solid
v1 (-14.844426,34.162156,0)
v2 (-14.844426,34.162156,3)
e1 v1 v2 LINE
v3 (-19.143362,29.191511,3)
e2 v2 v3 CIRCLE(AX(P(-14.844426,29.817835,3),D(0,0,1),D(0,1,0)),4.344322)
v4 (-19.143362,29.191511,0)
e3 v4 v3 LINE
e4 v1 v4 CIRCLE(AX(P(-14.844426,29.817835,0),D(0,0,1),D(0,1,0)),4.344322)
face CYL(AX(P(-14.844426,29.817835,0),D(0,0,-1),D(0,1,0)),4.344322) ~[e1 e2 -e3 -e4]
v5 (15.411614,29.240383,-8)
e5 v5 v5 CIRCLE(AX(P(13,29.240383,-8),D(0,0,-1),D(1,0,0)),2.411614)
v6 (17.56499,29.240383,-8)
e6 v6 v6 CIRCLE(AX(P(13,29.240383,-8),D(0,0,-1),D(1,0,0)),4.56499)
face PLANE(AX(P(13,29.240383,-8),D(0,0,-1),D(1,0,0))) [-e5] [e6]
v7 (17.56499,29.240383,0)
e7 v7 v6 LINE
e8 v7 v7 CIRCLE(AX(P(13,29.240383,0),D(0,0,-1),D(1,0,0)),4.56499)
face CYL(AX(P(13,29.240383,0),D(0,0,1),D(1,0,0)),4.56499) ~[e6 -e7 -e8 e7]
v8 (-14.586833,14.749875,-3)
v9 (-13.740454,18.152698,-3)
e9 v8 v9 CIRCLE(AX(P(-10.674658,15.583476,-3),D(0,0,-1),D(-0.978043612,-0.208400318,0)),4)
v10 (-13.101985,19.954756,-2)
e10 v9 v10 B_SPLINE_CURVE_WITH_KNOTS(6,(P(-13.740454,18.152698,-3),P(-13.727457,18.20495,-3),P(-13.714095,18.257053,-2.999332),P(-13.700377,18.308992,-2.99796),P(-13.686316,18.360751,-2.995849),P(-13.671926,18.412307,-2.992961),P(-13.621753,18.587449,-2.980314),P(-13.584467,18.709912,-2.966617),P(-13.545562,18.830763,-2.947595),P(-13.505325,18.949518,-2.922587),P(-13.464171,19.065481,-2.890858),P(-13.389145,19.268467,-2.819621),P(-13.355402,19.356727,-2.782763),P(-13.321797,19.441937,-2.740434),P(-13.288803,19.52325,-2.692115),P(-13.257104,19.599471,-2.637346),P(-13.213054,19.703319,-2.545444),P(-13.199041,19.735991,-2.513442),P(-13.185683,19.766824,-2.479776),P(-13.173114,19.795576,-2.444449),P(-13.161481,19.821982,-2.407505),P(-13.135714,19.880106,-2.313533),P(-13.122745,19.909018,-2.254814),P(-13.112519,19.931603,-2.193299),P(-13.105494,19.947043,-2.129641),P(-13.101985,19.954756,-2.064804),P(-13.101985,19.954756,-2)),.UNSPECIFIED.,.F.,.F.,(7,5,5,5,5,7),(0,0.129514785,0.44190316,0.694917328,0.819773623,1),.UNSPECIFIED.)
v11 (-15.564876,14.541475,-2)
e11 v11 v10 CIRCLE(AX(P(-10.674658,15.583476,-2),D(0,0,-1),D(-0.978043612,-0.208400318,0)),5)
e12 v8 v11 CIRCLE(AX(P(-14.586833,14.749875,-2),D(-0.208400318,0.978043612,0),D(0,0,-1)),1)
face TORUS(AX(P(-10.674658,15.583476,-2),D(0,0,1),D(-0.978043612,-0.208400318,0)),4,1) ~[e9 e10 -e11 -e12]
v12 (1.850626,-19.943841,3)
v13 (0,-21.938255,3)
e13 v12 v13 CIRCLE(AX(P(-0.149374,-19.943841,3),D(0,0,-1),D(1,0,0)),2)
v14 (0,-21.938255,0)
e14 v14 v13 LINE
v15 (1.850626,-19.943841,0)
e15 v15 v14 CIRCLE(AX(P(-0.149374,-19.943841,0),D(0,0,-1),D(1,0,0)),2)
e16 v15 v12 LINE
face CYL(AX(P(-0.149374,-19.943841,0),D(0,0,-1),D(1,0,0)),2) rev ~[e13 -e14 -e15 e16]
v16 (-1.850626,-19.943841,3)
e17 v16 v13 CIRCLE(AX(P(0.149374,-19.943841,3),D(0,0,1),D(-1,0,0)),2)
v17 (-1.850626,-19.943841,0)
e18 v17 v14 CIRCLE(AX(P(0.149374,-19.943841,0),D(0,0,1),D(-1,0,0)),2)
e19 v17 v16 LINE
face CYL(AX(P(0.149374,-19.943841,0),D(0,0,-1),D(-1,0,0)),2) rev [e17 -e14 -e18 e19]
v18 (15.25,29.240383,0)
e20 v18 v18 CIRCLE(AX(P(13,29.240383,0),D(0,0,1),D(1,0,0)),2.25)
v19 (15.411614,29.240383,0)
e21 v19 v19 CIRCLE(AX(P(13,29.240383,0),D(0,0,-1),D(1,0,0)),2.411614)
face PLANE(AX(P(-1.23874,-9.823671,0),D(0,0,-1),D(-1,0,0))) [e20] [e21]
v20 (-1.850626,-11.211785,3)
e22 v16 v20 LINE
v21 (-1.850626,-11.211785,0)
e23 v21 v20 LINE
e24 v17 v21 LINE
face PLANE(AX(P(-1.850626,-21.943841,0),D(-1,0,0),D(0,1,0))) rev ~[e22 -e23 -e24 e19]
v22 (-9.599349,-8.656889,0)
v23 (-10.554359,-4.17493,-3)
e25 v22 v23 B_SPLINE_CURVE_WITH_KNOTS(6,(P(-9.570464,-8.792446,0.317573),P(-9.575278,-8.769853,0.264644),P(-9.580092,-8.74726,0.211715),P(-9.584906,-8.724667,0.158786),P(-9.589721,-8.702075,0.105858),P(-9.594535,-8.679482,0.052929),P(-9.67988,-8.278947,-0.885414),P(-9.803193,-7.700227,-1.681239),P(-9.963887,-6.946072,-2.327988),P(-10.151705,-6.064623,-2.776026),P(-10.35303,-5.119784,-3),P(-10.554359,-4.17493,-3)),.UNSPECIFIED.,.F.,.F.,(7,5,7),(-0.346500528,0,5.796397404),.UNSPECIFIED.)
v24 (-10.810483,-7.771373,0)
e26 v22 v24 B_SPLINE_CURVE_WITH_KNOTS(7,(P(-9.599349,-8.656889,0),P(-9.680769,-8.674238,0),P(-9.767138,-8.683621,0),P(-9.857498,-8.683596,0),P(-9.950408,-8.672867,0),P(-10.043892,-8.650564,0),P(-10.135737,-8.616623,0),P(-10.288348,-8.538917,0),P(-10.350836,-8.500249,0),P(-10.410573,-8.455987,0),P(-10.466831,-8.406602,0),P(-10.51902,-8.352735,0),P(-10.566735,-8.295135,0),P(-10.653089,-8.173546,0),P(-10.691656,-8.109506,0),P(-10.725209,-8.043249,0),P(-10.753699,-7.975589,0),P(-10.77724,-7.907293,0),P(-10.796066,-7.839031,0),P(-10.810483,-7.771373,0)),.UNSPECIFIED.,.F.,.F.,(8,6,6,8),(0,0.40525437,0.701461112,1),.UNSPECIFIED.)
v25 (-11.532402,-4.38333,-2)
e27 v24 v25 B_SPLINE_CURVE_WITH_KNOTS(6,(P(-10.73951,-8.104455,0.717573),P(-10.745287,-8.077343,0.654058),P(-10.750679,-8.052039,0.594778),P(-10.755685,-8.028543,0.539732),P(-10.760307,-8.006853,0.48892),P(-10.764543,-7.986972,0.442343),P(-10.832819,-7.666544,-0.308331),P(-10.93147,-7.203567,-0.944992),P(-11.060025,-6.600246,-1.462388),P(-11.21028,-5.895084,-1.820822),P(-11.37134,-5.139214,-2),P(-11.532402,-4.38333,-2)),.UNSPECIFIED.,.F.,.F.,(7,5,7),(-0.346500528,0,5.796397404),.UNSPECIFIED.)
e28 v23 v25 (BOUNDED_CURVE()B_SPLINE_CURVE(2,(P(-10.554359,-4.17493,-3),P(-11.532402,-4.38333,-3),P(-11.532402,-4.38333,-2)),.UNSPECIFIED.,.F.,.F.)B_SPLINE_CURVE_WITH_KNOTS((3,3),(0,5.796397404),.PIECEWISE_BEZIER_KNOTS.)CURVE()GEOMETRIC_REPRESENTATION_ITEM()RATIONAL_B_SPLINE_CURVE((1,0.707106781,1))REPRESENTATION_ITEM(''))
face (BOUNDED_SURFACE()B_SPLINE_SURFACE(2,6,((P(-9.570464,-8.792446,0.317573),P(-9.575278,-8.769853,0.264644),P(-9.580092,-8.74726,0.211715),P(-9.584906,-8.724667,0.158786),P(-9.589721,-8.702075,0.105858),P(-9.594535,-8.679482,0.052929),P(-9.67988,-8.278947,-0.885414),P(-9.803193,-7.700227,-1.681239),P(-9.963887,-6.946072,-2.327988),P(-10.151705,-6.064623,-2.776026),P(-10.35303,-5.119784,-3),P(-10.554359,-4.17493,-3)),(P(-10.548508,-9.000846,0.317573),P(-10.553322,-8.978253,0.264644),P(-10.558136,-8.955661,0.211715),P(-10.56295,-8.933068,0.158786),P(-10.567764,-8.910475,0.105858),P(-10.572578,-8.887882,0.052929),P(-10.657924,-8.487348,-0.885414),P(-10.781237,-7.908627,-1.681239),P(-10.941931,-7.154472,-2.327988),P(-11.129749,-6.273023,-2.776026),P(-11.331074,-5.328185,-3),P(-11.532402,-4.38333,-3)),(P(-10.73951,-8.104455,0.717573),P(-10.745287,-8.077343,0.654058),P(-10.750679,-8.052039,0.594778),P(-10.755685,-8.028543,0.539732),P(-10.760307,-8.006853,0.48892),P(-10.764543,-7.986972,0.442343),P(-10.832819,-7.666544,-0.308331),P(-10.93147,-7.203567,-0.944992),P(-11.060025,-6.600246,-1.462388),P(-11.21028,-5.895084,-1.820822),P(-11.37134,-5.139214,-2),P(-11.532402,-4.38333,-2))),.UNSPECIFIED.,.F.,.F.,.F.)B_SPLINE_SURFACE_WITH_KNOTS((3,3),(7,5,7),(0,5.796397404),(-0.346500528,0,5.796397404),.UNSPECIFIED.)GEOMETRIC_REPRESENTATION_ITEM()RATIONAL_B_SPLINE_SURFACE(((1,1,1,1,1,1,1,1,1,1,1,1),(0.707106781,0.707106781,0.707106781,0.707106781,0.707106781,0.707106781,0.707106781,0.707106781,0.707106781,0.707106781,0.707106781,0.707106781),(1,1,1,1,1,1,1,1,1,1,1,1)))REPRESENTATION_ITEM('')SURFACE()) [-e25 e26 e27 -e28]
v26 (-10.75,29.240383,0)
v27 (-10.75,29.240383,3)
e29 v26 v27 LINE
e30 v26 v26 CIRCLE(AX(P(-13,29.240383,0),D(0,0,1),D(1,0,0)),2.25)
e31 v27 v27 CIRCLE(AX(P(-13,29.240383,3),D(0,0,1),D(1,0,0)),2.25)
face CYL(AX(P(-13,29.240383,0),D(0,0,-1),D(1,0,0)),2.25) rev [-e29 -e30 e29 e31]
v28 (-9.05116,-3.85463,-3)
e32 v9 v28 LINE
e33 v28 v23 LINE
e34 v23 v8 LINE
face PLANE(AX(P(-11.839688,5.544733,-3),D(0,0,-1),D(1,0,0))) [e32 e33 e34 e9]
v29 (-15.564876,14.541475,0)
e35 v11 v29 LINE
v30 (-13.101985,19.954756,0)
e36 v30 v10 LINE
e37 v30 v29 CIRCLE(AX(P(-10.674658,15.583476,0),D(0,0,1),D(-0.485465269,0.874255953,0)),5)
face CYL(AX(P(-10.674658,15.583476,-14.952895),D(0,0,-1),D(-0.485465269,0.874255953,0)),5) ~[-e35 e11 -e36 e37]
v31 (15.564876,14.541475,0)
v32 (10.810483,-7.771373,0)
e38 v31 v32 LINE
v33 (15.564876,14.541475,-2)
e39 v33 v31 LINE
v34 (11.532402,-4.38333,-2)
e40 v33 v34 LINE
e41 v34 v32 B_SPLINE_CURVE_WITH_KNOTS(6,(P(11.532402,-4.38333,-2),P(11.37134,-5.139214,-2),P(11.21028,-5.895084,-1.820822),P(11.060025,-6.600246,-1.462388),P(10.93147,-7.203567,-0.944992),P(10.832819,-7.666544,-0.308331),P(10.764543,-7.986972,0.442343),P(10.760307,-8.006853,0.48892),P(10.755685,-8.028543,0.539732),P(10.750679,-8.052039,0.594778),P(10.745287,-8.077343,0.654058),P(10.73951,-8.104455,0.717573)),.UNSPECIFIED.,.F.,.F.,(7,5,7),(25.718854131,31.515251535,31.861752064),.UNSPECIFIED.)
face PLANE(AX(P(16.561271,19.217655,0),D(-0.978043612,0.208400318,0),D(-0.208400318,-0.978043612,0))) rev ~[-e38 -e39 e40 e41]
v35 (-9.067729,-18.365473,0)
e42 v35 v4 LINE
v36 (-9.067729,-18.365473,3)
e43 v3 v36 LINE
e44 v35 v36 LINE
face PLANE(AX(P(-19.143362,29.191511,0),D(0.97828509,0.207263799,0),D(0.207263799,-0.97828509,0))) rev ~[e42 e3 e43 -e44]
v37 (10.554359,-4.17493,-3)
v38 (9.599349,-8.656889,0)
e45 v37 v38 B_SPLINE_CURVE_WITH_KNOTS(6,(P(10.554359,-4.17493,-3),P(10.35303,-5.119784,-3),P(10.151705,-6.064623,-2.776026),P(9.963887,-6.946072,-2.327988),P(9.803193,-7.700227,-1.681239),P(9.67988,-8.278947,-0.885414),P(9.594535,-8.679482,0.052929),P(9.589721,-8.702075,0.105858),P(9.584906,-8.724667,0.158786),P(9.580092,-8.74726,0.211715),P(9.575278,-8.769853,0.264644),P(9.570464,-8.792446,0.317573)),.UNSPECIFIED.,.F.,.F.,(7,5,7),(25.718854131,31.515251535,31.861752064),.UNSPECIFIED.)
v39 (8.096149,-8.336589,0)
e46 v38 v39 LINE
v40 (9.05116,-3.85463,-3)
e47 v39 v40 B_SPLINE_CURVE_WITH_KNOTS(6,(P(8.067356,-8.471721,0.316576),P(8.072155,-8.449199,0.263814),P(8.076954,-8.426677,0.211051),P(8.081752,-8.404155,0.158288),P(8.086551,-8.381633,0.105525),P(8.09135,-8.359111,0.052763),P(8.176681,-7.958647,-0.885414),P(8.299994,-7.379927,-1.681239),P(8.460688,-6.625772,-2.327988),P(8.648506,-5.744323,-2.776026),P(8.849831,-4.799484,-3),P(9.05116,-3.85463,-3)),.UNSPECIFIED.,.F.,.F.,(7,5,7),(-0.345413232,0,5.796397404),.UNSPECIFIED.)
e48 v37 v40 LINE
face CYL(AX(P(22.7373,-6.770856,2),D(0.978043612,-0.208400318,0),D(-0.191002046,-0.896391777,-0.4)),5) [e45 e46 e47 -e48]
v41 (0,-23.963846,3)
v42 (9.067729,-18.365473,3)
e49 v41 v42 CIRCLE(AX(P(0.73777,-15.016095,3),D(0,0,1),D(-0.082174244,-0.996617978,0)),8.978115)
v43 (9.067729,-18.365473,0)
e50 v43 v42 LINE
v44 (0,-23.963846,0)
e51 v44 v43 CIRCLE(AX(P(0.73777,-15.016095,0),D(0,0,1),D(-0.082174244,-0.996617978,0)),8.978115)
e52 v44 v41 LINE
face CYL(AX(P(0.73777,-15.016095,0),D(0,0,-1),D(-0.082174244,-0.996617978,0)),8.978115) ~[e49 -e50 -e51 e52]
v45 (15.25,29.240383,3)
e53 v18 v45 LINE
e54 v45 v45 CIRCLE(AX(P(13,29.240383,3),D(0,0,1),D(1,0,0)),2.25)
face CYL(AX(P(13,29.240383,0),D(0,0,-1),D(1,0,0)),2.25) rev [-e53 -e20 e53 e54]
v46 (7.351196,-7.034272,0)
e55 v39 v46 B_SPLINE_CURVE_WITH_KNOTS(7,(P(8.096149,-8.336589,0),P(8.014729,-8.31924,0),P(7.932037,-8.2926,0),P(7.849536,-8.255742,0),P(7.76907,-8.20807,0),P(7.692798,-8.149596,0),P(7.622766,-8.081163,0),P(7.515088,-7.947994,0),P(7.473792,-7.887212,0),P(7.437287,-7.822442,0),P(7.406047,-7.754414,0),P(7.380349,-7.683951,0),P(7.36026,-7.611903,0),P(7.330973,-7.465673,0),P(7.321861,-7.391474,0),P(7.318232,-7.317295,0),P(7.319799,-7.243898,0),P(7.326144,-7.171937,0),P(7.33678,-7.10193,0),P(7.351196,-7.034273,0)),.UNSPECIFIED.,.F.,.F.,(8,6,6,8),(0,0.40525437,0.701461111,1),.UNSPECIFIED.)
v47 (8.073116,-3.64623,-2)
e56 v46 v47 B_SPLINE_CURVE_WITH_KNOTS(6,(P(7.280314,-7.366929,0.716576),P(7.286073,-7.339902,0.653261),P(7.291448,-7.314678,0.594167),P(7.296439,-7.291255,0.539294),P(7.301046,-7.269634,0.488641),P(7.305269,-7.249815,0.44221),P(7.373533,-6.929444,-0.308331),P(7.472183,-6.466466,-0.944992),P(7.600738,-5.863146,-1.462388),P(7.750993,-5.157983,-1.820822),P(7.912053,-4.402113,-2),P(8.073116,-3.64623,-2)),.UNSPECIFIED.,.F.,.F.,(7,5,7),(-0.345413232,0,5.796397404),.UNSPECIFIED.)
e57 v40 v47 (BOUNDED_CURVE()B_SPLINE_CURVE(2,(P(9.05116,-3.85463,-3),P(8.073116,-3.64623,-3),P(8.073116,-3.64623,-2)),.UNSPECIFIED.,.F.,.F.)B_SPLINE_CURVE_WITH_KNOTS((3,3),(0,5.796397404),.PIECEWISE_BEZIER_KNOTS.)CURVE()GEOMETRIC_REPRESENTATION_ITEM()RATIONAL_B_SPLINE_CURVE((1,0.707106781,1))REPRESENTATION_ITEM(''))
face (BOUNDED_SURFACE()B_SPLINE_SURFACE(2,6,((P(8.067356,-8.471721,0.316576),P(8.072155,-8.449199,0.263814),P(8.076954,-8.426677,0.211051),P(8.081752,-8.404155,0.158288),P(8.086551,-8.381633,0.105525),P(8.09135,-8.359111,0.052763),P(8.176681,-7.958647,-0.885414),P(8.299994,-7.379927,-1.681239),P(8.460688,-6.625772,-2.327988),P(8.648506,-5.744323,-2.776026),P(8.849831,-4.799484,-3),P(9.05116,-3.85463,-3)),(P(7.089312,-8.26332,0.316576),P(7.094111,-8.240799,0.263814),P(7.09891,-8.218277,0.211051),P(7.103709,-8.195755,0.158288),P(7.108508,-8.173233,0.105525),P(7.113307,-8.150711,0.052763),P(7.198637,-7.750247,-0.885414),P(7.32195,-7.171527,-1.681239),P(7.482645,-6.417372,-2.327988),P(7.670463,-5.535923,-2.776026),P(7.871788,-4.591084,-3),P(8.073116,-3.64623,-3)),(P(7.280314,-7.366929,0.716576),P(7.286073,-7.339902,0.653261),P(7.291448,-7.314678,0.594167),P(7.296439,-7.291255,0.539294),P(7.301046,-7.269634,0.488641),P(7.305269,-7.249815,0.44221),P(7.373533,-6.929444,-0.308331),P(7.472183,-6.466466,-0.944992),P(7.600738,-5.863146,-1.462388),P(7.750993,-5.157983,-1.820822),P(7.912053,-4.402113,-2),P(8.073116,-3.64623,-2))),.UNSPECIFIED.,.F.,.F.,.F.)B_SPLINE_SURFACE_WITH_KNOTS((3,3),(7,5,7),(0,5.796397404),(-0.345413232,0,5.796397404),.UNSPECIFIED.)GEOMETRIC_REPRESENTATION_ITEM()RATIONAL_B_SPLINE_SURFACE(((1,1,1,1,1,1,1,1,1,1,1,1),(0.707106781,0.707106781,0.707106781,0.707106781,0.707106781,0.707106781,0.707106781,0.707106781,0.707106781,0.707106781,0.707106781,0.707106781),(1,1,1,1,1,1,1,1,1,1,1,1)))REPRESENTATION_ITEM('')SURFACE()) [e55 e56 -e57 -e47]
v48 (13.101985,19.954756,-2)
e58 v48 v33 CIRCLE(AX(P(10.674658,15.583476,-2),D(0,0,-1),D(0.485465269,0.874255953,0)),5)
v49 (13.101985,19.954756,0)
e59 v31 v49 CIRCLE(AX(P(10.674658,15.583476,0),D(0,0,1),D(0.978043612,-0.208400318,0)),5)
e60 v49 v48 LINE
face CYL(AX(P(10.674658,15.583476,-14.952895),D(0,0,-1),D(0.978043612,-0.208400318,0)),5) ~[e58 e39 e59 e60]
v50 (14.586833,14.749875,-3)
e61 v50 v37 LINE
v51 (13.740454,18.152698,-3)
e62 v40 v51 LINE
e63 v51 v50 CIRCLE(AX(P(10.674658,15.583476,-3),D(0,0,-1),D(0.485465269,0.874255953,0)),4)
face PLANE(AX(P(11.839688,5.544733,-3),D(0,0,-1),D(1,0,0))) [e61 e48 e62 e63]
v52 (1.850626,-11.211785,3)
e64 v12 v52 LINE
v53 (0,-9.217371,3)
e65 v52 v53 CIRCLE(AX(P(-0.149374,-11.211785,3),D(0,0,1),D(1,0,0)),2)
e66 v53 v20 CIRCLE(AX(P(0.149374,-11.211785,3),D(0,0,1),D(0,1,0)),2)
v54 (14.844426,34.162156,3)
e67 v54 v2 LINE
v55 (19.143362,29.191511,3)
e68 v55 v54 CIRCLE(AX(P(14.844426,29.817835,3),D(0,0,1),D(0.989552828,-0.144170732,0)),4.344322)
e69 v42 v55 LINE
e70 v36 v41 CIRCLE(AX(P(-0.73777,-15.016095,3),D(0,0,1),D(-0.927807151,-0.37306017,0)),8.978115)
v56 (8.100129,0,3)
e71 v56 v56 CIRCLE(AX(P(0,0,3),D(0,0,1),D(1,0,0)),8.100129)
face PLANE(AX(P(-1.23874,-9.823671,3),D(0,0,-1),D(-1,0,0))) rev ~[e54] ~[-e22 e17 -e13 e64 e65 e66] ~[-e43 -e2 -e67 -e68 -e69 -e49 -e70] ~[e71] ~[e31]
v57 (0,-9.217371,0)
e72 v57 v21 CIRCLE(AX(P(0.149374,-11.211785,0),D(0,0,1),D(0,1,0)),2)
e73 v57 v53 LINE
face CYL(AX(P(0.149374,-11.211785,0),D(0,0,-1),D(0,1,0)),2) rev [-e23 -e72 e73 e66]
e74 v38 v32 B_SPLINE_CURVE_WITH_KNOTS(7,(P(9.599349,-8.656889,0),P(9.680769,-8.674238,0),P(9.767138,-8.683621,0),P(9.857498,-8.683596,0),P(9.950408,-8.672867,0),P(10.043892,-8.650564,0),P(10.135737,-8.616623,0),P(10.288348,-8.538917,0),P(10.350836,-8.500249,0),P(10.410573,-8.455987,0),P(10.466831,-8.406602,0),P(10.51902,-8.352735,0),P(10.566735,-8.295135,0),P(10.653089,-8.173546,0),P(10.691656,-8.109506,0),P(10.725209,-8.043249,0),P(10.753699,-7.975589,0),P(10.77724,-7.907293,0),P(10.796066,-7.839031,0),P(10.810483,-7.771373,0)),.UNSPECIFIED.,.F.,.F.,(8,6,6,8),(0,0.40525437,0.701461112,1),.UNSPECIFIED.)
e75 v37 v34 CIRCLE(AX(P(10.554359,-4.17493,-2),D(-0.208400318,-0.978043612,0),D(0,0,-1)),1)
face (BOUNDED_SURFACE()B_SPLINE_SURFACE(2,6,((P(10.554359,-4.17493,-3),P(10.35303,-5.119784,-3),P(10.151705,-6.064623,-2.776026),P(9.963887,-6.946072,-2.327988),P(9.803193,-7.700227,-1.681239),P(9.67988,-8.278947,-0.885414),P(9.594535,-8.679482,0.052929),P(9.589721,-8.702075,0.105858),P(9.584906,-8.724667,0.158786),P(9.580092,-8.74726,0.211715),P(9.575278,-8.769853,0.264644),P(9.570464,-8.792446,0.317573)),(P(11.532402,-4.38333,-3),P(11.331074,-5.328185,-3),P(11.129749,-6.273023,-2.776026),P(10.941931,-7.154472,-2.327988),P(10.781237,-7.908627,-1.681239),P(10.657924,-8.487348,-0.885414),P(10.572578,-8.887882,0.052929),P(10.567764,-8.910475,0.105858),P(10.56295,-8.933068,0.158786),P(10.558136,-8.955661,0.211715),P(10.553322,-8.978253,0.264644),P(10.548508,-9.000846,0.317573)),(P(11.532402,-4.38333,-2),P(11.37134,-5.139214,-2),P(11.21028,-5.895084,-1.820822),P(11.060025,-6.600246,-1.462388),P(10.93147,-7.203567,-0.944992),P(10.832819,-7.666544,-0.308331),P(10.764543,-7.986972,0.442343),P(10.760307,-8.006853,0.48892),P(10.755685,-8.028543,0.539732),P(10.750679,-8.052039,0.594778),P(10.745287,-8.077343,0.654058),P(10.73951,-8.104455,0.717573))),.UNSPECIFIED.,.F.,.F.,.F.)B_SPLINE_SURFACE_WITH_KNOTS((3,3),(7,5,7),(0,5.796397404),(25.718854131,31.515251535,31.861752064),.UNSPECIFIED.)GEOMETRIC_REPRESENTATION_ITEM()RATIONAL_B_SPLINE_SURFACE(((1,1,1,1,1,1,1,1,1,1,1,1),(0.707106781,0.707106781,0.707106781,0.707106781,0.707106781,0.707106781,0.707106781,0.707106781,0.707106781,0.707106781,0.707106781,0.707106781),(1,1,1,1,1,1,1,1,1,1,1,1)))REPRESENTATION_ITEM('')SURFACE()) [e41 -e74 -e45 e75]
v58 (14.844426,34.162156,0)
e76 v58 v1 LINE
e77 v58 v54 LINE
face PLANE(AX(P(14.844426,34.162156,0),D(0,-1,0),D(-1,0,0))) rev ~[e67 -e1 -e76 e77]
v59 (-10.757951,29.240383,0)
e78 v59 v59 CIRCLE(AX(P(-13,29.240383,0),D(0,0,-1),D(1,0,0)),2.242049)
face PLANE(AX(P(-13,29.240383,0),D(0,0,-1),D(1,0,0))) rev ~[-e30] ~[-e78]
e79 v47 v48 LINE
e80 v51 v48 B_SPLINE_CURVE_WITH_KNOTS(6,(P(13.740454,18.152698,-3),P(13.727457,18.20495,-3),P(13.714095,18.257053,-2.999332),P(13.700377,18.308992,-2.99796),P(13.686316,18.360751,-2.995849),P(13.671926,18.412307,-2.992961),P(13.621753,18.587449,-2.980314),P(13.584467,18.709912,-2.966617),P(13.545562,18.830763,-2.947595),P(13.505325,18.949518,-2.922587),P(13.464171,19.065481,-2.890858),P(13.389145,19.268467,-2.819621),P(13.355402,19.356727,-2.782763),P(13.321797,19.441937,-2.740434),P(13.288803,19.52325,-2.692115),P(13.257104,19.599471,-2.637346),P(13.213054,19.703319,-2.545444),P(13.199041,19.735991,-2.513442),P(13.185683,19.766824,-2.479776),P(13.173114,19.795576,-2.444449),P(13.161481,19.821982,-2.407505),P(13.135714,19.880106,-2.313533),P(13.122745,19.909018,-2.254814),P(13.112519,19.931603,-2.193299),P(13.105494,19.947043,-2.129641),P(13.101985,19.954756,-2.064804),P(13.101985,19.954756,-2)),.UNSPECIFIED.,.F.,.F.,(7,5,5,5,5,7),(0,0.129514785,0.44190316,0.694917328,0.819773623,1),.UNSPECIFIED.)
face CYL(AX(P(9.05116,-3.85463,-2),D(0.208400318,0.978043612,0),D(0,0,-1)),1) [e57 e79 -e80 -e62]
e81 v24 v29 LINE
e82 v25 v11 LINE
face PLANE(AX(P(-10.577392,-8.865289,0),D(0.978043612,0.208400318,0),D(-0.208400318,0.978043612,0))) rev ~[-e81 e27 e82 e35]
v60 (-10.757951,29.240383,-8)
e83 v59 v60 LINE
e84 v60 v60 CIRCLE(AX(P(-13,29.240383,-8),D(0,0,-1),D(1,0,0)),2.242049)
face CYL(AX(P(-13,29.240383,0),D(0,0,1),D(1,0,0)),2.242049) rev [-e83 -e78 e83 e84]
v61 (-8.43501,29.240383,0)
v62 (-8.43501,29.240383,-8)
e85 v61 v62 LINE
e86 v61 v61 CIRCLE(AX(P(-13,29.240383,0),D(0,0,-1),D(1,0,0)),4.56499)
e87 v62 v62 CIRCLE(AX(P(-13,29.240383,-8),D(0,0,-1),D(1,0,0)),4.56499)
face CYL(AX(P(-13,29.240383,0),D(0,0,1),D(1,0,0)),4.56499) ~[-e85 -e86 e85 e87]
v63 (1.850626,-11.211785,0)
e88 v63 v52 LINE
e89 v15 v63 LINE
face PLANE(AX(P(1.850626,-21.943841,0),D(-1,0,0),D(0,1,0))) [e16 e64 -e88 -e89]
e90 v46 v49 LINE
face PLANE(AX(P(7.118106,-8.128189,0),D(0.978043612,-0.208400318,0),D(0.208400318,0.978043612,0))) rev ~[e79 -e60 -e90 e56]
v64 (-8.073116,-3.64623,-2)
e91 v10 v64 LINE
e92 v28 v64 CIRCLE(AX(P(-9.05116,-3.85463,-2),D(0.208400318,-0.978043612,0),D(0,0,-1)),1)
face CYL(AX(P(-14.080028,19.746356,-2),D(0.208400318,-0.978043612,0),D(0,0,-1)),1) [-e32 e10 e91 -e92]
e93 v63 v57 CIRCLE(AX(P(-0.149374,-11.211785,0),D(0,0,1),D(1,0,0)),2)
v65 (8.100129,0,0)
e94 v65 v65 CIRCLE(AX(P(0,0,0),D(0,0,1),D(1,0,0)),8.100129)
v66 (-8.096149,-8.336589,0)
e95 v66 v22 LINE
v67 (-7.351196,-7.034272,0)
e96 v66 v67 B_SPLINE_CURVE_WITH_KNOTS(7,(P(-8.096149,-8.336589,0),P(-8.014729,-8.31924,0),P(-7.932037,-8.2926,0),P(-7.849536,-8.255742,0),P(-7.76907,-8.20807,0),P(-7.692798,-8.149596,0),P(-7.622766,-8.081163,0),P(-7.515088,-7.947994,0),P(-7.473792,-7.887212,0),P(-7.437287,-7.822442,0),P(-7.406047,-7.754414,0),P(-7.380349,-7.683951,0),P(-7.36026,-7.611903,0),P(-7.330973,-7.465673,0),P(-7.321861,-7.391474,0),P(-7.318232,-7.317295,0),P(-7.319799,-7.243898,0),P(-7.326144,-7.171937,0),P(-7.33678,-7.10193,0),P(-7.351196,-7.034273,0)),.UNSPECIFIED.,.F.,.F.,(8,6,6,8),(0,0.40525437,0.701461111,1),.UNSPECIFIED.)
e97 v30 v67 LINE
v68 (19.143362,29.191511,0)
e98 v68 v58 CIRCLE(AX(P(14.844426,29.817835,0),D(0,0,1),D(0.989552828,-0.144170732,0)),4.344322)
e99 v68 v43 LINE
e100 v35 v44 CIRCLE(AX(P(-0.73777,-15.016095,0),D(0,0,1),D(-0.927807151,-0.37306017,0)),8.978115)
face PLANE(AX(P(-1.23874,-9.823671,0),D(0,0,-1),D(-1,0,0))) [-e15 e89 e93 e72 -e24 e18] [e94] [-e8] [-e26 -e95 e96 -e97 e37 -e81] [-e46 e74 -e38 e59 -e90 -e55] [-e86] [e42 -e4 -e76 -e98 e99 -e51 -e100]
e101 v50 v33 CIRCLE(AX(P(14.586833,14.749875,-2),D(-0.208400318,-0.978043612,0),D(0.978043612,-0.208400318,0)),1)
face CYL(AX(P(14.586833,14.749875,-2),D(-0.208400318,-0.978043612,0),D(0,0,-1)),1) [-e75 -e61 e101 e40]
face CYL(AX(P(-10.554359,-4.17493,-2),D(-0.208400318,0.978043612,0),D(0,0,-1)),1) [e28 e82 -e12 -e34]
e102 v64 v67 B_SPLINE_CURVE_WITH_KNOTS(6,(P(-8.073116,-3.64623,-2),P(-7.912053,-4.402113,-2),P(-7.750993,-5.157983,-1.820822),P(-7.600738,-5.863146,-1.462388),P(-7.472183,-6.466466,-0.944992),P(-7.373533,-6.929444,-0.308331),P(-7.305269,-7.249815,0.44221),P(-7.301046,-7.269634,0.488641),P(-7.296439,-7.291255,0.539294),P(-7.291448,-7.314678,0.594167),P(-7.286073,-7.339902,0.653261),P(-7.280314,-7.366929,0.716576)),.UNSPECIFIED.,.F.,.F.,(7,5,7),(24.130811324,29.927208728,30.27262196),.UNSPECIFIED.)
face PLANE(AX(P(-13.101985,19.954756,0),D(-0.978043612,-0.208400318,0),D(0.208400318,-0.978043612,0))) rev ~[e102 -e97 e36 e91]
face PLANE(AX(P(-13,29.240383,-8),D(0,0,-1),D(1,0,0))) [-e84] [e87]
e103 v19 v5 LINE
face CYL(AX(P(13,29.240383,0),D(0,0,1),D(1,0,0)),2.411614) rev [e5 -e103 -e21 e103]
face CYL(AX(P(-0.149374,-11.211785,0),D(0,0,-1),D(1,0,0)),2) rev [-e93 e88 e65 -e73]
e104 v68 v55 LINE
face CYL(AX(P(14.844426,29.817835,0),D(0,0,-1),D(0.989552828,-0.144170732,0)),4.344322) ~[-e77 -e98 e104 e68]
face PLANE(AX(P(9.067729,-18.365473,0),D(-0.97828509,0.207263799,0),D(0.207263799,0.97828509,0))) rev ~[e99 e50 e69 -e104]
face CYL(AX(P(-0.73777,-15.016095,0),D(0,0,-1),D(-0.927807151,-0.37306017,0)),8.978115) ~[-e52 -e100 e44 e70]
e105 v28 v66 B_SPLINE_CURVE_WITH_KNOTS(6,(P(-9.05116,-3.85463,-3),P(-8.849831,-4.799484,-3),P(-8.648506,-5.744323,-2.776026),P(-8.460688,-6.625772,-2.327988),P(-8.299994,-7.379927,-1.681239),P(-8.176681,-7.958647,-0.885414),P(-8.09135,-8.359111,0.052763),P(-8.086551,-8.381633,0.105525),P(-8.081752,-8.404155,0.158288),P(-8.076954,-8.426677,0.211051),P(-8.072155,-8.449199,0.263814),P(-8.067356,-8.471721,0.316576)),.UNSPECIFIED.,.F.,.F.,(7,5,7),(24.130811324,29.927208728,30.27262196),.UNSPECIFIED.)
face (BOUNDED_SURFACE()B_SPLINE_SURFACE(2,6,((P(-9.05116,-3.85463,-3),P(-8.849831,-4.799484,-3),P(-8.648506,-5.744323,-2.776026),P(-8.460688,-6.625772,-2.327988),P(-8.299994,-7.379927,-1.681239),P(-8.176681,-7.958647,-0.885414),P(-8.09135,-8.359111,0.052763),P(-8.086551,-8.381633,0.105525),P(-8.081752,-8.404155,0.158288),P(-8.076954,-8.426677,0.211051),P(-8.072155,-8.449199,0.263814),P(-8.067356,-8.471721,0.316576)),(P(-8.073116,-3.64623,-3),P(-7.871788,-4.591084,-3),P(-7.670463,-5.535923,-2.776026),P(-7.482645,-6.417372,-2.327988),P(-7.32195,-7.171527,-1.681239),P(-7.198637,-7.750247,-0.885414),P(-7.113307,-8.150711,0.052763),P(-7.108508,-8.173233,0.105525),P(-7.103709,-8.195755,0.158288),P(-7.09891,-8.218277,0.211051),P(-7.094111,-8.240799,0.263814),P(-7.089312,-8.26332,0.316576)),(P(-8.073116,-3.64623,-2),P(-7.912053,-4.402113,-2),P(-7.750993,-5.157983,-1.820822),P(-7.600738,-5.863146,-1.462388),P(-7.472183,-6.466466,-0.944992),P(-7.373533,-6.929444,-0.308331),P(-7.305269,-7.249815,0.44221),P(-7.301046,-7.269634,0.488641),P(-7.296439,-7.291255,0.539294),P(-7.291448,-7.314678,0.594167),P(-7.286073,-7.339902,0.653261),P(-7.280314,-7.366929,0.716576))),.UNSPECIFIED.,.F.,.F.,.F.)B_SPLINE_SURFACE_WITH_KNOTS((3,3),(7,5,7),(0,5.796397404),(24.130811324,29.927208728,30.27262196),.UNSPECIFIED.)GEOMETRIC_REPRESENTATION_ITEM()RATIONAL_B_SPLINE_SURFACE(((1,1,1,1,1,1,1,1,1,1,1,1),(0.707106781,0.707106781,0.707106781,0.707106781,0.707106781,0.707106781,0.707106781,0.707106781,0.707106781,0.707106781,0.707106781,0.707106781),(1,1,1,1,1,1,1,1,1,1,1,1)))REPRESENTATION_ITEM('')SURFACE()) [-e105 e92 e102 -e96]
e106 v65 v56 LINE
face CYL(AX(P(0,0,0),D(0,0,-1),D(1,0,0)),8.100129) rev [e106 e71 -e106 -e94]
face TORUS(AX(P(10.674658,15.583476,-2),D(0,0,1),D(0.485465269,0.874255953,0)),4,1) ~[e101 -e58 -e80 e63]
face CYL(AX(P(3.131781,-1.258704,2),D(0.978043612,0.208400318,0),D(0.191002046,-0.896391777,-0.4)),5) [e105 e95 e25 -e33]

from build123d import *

# Parameters (mm, degrees)
F0_W        = 3.7012519315
F0_H        = 12.7320559695
F0_R        = 8.100129487
F0_R_2      = 2.25
F1_DEPTH    = 3
F2_T1_DEPTH = 3
F3_R        = 4.5649895604
F3_R_2      = 2.4116141927
F3_R_3      = 2.2420485947
F4_DEPTH    = 8
F6_DEPTH    = 3
F7_T1_DEPTH = 14.95289459
F7_T3_DEPTH = 26.4498235383
F7_T5_DEPTH = 26.4498235383
F8_R        = 1


# Not quite as in the source:
# - a fillet or chamfer that OpenCascade refuses, or shapes differently, is made with other operations: its cross-section is extruded or revolved along the edge and cut away or added


with BuildPart() as f1:
    # F0 (on Top) → F1 (new body)
    with BuildSketch(Plane.XY):
        with BuildLine():
            Line((14.8444259539, 34.1621562839), (0, 34.1621562839))
            Line((0, 34.1621562839), (-14.8444259539, 34.1621562839))
            ThreePointArc((-14.8444259539, 34.1621562839), (-18.1303110964, 32.6596806941), (-19.1433615983, 29.1915107518))
            Line((-19.1433615983, 29.1915107518), (-9.0677291155, -18.3654725552))
            ThreePointArc((-9.0677291155, -18.3654725552), (-5.4543132889, -22.6555173257), (0, -23.9638462663))
            ThreePointArc((0, -23.9638462663), (5.4543132889, -22.6555173257), (9.0677291155, -18.3654725552))
            Line((9.0677291155, -18.3654725552), (19.1433615983, 29.1915107518))
            ThreePointArc((19.1433615983, 29.1915107518), (18.1303110964, 32.6596806941), (14.8444259539, 34.1621562839))
        make_face()
        with Locations((0, -15.5778131448)):
            Rectangle(F0_W, F0_H, mode=Mode.SUBTRACT)
        Circle(F0_R, mode=Mode.SUBTRACT)
        with Locations((-13, 29.2403830344)):
            Circle(F0_R_2, mode=Mode.SUBTRACT)
        with Locations((13, 29.2403830344)):
            Circle(F0_R_2, mode=Mode.SUBTRACT)
    extrude(amount=F1_DEPTH)

    # F2: fillet of radius 2 on 4 edges, made by hand

    # F2_s2 → F2_t1 (join)
    with BuildSketch(Plane.XY):
        with BuildLine():
            ThreePointArc((0.1493740343, -9.21178516), (-1.2648395281, -9.7975715976), (-1.8506259657, -11.21178516))
            Line((-1.8506259657, -11.21178516), (-1.8506259657, -9.21178516))
            Line((-1.8506259657, -9.21178516), (0.1493740343, -9.21178516))
        make_face()
        with BuildLine():
            ThreePointArc((1.8506259657, -11.21178516), (1.2648395281, -9.7975715976), (-0.1493740343, -9.21178516))
            Line((-0.1493740343, -9.21178516), (1.8506259657, -9.21178516))
            Line((1.8506259657, -9.21178516), (1.8506259657, -11.21178516))
        make_face()
        with BuildLine():
            ThreePointArc((-1.8506259657, -19.9438411295), (-1.2648395281, -21.3580546919), (0.1493740343, -21.9438411295))
            Line((0.1493740343, -21.9438411295), (-1.8506259657, -21.9438411295))
            Line((-1.8506259657, -21.9438411295), (-1.8506259657, -19.9438411295))
        make_face()
        with BuildLine():
            ThreePointArc((1.8506259657, -19.9438411295), (1.2648395281, -21.3580546919), (-0.1493740343, -21.9438411295))
            Line((-0.1493740343, -21.9438411295), (1.8506259657, -21.9438411295))
            Line((1.8506259657, -21.9438411295), (1.8506259657, -19.9438411295))
        make_face()
    extrude(amount=F2_T1_DEPTH)

    # F3 (on face) → F4 (join)
    with BuildSketch(Plane(origin=(0, 0, 0), x_dir=(1, 0, 0), z_dir=(0, 0, -1))):
        with Locations((13, -29.2403830344)):
            Circle(F3_R)
        with Locations((13, -29.2403830344)):
            Circle(F3_R_2, mode=Mode.SUBTRACT)
        with Locations((-13, -29.2403830344)):
            Circle(F3_R)
        with Locations((-13, -29.2403830344)):
            Circle(F3_R_3, mode=Mode.SUBTRACT)
    extrude(amount=F4_DEPTH)

    # F5 (on face) → F6 (join)
    with BuildSketch(Plane(origin=(0, 0, 0), x_dir=(1, 0, 0), z_dir=(0, 0, -1))):
        Polygon((-7.118105705, 8.1281888095), (-10.5773922314, 8.8652892849), (-16.5612712118, -19.2176554765), (-13.1019846854, -19.9547559519), align=None)
        Polygon((16.5612712118, -19.2176554765), (10.5773922314, 8.8652892849), (7.118105705, 8.1281888095), (13.1019846854, -19.9547559519), align=None)
    extrude(amount=F6_DEPTH)

    # F7: fillet of radius 5 on 4 edges, made by hand

    # F7_s2 → F7_t1 (cut)
    with BuildSketch(Plane.XY.offset(-14.95289459)):
        with BuildLine():
            ThreePointArc((-13.1019846854, 19.9547559519), (-15.2257590624, 17.6540998095), (-15.5648763993, 14.5414745957))
            Line((-15.5648763993, 14.5414745957), (-16.5612712118, 19.2176554765))
            Line((-16.5612712118, 19.2176554765), (-13.1019846854, 19.9547559519))
        make_face()
        with BuildLine():
            ThreePointArc((15.5648763993, 14.5414745957), (15.2257590624, 17.6540998095), (13.1019846854, 19.9547559519))
            Line((13.1019846854, 19.9547559519), (16.5612712118, 19.2176554765))
            Line((16.5612712118, 19.2176554765), (15.5648763993, 14.5414745957))
        make_face()
    extrude(amount=F7_T1_DEPTH, mode=Mode.SUBTRACT)

    # F7_s4 → F7_t3 (cut)
    with BuildSketch(Plane(origin=(23.1298700172, -4.9284839674, 0), x_dir=(0, 0, 1), z_dir=(-0.9780436123, 0.2084003178, 0))):
        with BuildLine():
            ThreePointArc((0, -6.4663076535), (-2.1833001327, -4.622344746), (-3, -1.8837319585))
            Line((-3, -1.8837319585), (-3, -6.4663076535))
            Line((-3, -6.4663076535), (0, -6.4663076535))
        make_face()
    extrude(amount=F7_T3_DEPTH, mode=Mode.SUBTRACT)

    # F7_s6 → F7_t5 (cut)
    with BuildSketch(Plane(origin=(2.7392109406, 0.5836676641, 0), x_dir=(0, 0, 1), z_dir=(-0.9780436123, -0.2084003178, 0))):
        with BuildLine():
            ThreePointArc((0, -6.4663076535), (-2.1833001327, -4.622344746), (-3, -1.8837319585))
            Line((-3, -1.8837319585), (-3, -6.4663076535))
            Line((-3, -6.4663076535), (0, -6.4663076535))
        make_face()
    extrude(amount=F7_T5_DEPTH, mode=Mode.SUBTRACT)

    # F8
    f8_edges = [f1.edges().sort_by_distance(p)[0] for p in [
        (-10.58755, 8.154263, -3),
        (10.58755, 8.154263, -3),
        (13.548639, 5.079072, -3),
        (-13.548639, 5.079072, -3),
        (-15.225759, 17.6541, -3),
        (-10.961675, -7.061813, -2.1833),
        (-7.502388, -6.324713, -2.1833),
        (15.225759, 17.6541, -3),
        (7.502388, -6.324713, -2.1833),
        (10.961675, -7.061813, -2.1833),
    ]]
    fillet(f8_edges, radius=F8_R)


solid = f1.part
